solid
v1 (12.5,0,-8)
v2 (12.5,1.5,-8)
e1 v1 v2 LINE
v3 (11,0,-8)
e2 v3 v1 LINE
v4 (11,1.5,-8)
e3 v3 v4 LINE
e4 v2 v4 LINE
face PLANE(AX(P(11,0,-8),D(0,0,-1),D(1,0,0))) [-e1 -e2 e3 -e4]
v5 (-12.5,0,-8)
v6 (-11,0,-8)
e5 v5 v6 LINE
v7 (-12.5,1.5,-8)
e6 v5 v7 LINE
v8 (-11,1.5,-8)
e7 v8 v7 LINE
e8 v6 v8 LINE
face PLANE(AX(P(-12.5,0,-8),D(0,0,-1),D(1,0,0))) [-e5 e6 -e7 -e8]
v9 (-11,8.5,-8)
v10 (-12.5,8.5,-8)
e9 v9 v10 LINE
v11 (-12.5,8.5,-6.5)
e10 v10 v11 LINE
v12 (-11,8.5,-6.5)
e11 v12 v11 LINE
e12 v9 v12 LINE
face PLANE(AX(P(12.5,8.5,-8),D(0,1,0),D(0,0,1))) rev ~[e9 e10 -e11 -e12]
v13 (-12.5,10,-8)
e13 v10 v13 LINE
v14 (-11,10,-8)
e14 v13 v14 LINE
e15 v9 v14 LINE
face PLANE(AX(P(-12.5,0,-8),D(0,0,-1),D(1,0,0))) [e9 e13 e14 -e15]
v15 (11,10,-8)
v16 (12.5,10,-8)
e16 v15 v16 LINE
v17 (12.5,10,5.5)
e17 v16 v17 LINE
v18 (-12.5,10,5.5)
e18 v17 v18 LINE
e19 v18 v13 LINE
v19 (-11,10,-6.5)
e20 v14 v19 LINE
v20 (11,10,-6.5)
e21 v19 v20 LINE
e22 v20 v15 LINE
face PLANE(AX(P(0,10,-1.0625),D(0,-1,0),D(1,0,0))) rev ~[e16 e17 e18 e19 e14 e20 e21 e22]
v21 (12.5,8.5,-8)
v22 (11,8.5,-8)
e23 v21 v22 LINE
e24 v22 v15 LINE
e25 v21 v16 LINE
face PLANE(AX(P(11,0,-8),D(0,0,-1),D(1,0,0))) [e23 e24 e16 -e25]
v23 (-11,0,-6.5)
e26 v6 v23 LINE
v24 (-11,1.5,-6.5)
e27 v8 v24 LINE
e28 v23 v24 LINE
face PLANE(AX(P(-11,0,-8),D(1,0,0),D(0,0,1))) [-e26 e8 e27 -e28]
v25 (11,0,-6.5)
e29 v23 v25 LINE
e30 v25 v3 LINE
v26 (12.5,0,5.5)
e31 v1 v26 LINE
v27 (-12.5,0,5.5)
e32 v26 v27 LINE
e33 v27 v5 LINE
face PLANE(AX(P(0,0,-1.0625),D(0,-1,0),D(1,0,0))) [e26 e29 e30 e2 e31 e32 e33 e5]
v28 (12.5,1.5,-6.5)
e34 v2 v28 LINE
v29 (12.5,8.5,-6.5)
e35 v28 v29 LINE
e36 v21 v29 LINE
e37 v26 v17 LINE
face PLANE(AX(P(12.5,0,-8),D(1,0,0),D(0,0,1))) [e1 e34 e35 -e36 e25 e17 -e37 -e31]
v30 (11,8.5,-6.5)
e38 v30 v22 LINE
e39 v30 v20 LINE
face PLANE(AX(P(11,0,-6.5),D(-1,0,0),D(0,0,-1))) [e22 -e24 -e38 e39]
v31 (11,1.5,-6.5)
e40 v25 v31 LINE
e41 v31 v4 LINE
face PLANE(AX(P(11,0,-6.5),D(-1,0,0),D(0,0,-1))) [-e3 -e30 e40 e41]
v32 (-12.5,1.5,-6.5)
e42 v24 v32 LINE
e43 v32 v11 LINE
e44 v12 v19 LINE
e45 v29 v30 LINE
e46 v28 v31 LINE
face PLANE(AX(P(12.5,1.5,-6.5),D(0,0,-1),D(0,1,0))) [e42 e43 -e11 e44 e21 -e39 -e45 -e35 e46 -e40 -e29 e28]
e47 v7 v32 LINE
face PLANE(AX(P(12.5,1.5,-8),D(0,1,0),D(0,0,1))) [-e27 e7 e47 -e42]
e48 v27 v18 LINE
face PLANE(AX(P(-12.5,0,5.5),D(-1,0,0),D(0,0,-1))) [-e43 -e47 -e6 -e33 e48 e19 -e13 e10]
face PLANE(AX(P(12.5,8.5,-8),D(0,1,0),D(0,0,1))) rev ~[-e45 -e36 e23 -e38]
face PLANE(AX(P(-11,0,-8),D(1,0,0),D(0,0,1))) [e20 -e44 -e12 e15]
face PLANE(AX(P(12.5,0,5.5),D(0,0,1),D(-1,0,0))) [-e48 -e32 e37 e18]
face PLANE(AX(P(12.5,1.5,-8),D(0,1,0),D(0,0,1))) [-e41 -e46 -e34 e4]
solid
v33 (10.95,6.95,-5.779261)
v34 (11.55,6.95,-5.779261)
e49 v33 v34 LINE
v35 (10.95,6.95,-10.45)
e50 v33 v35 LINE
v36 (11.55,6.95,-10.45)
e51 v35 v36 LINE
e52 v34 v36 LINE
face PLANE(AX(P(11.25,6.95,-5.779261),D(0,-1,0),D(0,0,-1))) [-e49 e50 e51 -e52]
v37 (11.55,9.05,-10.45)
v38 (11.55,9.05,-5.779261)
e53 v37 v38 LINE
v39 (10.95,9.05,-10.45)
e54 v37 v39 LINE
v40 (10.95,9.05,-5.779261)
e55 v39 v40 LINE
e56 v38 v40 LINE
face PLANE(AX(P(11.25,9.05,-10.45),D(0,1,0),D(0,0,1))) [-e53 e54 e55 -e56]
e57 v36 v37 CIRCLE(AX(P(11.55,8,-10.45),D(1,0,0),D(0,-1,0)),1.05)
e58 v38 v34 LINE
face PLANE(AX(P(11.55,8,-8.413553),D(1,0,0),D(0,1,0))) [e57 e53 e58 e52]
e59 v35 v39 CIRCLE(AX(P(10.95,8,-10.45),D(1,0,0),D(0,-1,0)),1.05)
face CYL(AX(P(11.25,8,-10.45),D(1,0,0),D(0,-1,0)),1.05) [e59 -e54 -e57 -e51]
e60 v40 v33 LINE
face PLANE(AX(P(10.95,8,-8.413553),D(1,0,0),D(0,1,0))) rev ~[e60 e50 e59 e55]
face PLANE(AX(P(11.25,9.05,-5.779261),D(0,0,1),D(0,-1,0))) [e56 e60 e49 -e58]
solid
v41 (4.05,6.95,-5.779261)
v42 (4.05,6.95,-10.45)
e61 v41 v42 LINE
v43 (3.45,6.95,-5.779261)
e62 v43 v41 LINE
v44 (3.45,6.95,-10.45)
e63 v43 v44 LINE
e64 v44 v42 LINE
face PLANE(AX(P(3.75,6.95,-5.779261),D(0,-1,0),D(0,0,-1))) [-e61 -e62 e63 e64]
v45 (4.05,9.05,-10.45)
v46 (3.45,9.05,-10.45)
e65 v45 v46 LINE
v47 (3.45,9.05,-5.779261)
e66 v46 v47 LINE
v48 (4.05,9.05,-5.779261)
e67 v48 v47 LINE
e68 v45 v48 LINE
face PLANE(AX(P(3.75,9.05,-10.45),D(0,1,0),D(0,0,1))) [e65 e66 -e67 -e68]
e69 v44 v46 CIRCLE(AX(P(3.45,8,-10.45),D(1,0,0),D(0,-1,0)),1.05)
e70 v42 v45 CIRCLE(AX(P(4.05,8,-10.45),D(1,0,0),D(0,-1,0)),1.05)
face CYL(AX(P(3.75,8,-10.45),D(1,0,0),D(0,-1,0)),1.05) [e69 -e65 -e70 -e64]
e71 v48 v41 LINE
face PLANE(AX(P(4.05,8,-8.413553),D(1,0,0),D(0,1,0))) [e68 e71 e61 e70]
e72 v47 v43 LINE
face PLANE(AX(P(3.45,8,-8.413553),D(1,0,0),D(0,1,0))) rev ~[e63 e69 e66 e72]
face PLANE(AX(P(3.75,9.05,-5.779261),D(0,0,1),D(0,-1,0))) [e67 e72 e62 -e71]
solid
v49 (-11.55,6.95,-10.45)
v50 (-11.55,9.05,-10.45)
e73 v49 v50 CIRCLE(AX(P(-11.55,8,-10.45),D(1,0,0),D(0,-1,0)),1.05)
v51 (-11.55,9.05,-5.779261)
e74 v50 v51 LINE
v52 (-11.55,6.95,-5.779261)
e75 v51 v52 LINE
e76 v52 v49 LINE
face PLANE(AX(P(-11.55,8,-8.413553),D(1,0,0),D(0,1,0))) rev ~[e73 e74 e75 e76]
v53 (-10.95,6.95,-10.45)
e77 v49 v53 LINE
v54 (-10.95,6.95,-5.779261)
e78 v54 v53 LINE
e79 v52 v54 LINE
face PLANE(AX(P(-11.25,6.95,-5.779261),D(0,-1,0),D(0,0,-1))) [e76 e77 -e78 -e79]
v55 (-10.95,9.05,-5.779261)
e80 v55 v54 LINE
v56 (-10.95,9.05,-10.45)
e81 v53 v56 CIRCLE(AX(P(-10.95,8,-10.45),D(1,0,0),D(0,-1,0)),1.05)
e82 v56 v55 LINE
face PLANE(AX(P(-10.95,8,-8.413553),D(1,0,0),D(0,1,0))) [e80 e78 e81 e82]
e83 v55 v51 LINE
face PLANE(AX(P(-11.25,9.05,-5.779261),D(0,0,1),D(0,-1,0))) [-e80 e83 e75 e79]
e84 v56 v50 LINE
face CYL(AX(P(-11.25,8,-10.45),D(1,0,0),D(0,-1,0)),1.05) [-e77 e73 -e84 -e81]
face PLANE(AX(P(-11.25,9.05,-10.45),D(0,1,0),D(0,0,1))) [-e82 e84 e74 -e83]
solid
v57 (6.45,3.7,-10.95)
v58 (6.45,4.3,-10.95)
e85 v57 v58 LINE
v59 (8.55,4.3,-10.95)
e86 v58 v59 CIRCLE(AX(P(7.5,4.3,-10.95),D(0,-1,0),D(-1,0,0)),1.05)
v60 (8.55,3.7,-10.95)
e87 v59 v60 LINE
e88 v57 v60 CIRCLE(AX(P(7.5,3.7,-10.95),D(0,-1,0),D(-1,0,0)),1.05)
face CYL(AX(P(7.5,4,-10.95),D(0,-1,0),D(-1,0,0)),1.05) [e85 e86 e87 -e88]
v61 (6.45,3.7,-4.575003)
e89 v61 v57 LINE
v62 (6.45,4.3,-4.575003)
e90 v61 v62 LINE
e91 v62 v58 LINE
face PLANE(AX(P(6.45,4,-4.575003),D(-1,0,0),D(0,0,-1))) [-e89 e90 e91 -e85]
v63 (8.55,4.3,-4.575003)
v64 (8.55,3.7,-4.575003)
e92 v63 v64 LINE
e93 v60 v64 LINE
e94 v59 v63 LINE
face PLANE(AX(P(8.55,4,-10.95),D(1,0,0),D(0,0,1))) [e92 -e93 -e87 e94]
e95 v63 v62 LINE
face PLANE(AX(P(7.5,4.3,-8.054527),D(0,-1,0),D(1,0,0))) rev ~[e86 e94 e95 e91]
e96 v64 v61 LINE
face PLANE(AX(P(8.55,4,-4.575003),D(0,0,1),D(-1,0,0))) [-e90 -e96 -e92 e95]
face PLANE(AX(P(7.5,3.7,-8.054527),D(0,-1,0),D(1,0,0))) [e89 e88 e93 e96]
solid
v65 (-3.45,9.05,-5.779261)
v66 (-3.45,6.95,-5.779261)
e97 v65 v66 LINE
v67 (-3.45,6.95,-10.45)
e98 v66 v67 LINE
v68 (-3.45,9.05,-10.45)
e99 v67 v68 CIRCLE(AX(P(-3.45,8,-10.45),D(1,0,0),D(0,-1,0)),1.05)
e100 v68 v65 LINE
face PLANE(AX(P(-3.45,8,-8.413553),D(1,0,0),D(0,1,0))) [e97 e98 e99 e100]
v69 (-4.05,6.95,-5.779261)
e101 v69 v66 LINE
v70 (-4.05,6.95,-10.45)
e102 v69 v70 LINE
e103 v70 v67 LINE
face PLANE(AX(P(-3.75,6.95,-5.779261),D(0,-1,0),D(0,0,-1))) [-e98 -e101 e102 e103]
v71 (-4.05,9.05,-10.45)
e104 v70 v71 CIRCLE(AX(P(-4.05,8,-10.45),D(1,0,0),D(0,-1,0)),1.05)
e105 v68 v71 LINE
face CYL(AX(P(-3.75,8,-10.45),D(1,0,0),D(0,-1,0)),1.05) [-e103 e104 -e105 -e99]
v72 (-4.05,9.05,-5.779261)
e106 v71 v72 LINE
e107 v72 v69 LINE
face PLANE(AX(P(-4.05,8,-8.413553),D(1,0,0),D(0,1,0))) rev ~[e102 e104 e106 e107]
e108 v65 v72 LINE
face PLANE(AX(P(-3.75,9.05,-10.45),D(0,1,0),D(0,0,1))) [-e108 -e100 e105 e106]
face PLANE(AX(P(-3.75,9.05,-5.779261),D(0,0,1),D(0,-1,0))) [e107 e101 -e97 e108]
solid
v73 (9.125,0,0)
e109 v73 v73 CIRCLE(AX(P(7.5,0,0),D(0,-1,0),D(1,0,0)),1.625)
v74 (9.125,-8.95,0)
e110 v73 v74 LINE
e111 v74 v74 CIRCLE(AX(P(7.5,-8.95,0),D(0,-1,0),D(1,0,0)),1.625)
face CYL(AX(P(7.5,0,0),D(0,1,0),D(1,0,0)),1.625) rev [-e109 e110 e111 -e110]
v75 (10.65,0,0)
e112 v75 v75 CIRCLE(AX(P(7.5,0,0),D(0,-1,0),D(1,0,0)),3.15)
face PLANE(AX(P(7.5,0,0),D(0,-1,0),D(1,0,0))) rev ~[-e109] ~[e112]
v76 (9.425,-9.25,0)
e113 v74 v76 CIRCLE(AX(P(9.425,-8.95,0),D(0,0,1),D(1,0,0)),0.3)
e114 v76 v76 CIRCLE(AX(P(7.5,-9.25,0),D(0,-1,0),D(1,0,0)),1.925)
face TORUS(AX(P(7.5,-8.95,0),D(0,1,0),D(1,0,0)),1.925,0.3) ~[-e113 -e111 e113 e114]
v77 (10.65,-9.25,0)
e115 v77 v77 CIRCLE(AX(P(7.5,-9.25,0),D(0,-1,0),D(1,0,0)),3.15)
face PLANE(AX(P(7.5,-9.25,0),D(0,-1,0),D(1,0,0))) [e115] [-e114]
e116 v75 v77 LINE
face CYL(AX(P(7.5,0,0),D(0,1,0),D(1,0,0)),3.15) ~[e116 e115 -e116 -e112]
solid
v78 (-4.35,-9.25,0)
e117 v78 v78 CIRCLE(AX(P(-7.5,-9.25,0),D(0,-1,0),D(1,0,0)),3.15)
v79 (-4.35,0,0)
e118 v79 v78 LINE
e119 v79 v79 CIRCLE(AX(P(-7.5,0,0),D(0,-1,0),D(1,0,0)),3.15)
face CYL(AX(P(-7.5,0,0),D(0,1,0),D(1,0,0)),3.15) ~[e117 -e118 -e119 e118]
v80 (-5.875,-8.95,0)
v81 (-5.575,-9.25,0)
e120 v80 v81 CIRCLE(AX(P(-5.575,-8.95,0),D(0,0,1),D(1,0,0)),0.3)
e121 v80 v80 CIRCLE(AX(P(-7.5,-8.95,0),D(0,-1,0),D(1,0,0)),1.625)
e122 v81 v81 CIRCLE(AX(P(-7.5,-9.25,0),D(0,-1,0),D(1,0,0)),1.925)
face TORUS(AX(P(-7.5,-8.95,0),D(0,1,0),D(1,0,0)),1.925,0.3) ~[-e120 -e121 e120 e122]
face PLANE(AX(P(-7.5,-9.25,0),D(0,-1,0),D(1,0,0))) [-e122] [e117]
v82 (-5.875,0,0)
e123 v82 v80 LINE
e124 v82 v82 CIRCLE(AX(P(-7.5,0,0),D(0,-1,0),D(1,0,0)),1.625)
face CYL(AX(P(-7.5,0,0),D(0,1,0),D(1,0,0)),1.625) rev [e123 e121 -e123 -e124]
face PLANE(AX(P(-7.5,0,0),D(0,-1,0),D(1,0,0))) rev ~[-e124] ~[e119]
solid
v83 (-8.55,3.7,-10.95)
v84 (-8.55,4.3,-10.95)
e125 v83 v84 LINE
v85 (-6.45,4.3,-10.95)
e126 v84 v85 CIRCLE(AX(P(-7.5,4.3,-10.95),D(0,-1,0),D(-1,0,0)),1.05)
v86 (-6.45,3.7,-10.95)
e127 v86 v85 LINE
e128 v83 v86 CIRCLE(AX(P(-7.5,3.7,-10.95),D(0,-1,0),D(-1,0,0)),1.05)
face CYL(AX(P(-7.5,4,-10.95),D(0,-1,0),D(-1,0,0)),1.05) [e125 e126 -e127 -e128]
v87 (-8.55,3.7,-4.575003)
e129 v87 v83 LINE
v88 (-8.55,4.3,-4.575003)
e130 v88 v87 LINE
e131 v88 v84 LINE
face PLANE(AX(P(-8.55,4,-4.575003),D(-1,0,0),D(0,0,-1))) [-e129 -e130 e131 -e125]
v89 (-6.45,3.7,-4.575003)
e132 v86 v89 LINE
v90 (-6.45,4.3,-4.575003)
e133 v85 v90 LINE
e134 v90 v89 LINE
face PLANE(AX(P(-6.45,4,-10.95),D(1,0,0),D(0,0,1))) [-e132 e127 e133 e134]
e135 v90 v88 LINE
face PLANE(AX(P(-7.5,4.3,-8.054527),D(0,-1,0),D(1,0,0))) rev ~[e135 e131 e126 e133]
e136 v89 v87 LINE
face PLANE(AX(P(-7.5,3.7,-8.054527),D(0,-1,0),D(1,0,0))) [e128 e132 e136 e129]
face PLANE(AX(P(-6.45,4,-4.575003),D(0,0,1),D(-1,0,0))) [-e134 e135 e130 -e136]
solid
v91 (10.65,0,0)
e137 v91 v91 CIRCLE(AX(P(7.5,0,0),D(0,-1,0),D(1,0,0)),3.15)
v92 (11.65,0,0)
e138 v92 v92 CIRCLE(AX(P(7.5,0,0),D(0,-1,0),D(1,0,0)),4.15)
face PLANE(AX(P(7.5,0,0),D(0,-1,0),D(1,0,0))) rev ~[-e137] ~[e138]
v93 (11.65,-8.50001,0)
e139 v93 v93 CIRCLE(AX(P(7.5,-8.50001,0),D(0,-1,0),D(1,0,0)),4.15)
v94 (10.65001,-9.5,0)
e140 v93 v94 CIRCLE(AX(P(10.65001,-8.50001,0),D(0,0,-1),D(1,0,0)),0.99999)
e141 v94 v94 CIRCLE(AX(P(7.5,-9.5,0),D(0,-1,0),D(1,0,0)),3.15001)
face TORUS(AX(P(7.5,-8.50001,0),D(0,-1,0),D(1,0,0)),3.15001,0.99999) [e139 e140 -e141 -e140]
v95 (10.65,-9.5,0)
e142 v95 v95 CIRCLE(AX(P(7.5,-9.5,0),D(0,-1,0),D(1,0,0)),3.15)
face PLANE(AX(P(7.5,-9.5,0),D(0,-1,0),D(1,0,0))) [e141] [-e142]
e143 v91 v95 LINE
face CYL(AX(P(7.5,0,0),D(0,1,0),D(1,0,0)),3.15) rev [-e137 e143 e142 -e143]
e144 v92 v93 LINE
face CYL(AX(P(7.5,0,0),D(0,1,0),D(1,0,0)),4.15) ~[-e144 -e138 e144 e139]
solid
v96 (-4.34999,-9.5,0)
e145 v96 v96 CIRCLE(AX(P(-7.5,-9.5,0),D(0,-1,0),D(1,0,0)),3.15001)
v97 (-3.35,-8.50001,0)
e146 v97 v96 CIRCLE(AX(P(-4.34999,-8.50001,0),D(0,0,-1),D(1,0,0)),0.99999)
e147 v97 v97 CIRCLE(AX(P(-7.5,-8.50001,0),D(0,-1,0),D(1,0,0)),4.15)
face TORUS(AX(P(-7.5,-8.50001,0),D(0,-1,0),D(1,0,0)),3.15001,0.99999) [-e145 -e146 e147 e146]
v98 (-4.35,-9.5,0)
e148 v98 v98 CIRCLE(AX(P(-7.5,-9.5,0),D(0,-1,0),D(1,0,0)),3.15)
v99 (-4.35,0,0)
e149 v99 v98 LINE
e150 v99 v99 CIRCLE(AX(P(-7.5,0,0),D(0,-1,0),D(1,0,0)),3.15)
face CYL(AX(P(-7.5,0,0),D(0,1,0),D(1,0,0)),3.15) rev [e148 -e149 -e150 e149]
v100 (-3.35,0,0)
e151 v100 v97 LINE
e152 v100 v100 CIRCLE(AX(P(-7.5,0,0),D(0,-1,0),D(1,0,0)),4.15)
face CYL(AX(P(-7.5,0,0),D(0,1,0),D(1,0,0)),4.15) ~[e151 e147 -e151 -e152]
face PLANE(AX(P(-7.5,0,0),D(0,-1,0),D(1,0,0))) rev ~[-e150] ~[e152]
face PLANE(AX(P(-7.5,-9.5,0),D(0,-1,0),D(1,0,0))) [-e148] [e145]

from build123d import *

# Parameters (mm, degrees)
F0_R           = 4.15
F0_R_2         = 3.15
F1_DEPTH       = 9.5
F0_R_3         = 1.625
F2_DEPTH       = 9.25
F3_R           = 0.99999
F3_2_R         = 0.99999
F4_DEPTH       = 10
F6_W           = 7
F6_H           = 1.5
F7_DEPTH       = 25
F10_DEPTH      = 0.3
F10_DEPTH_BACK = 0.3
F19_DEPTH      = 0.3
F19_DEPTH_BACK = 0.3
F20_R          = 0.3
F20_2_R        = 0.3


# Not quite as in the source:
# - a fillet or chamfer is up to 0.001 mm smaller than in the source, because OpenCascade refuses the exact size


with BuildPart() as f1:
    # F0 (on Front) → F1 (new body)
    with BuildSketch(Plane.XZ):
        with Locations((-7.5, 0)):
            Circle(F0_R)
        with Locations((-7.5, 0)):
            Circle(F0_R_2, mode=Mode.SUBTRACT)
    extrude(amount=F1_DEPTH)

    # F3 (radius 1 in the source; OpenCascade refuses exactly that, so slightly less here)
    f3_edges = [f1.edges().sort_by_distance(p)[0] for p in [
        (-11.65, -9.5, 0),
    ]]
    fillet(f3_edges, radius=F3_R)


with BuildPart() as f1b:
    # F0 (on Front) → F1, piece 2 (new body)
    with BuildSketch(Plane.XZ):
        with Locations((7.5, 0)):
            Circle(F0_R)
        with Locations((7.5, 0)):
            Circle(F0_R_2, mode=Mode.SUBTRACT)
    extrude(amount=F1_DEPTH)

    # F3#2 (radius 1 in the source; OpenCascade refuses exactly that, so slightly less here)
    f3_2_edges = [f1b.edges().sort_by_distance(p)[0] for p in [
        (3.35, -9.5, 0),
    ]]
    fillet(f3_2_edges, radius=F3_2_R)


with BuildPart() as f2:
    # F0 (on Front) → F2 (new body)
    with BuildSketch(Plane.XZ):
        with Locations((-7.5, 0)):
            Circle(F0_R_2)
        with Locations((-7.5, 0)):
            Circle(F0_R_3, mode=Mode.SUBTRACT)
    extrude(amount=F2_DEPTH)

    # F20
    f20_edges = [f2.edges().sort_by_distance(p)[0] for p in [
        (-9.125, -9.25, 0),
    ]]
    fillet(f20_edges, radius=F20_R)


with BuildPart() as f2b:
    # F0 (on Front) → F2, piece 2 (new body)
    with BuildSketch(Plane.XZ):
        with Locations((7.5, 0)):
            Circle(F0_R_2)
        with Locations((7.5, 0)):
            Circle(F0_R_3, mode=Mode.SUBTRACT)
    extrude(amount=F2_DEPTH)

    # F20#2
    f20_2_edges = [f2b.edges().sort_by_distance(p)[0] for p in [
        (5.875, -9.25, 0),
    ]]
    fillet(f20_2_edges, radius=F20_2_R)


with BuildPart() as f4:
    # F0 (on Front) → F4 (new body)
    with BuildSketch(Plane.XZ):
        Polygon((12.5, 5.5), (-12.5, 5.5), (-12.5, -8), (-11, -8), (-11, -6.5), (11, -6.5), (11, -8), (12.5, -8), align=None)
        with Locations((-7.5, 0)):
            Circle(F0_R, mode=Mode.SUBTRACT)
        with Locations((7.5, 0)):
            Circle(F0_R, mode=Mode.SUBTRACT)
        with Locations((7.5, 0)):
            Circle(F0_R)
        with Locations((7.5, 0)):
            Circle(F0_R_2, mode=Mode.SUBTRACT)
        with Locations((-7.5, 0)):
            Circle(F0_R)
        with Locations((-7.5, 0)):
            Circle(F0_R_2, mode=Mode.SUBTRACT)
        with Locations((7.5, 0)):
            Circle(F0_R_2)
        with Locations((7.5, 0)):
            Circle(F0_R_3, mode=Mode.SUBTRACT)
        with Locations((-7.5, 0)):
            Circle(F0_R_2)
        with Locations((-7.5, 0)):
            Circle(F0_R_3, mode=Mode.SUBTRACT)
        with Locations((7.5, 0)):
            Circle(F0_R_3)
        with Locations((-7.5, 0)):
            Circle(F0_R_3)
    extrude(amount=-F4_DEPTH)

    # F6 (on offset) → F7 (cut)
    with BuildSketch(Plane.YZ.offset(12.5)):
        with Locations((5, -7.25)):
            Rectangle(F6_W, F6_H)
    extrude(amount=-F7_DEPTH, mode=Mode.SUBTRACT)


with BuildPart() as f10:
    # F9 (on offset) → F10 (new body, two sides)
    with BuildSketch(Plane.XZ.offset(-4)) as f10_sk:
        with BuildLine():
            Line((-6.45, -10.95), (-6.45, -4.5750031686))
            Line((-6.45, -4.5750031686), (-8.55, -4.5750031686))
            Line((-8.55, -4.5750031686), (-8.55, -10.95))
            ThreePointArc((-8.55, -10.95), (-7.5, -12), (-6.45, -10.95))
        make_face()
    extrude(amount=F10_DEPTH)
    extrude(f10_sk.sketch, amount=-F10_DEPTH_BACK)


with BuildPart() as f10b:
    # F9 (on offset) → F10, piece 2 (new body, two sides)
    with BuildSketch(Plane.XZ.offset(-4)) as f10_2_sk:
        with BuildLine():
            ThreePointArc((6.45, -10.95), (7.5, -12), (8.55, -10.95))
            Line((8.55, -10.95), (8.55, -4.5750031686))
            Line((8.55, -4.5750031686), (6.45, -4.5750031686))
            Line((6.45, -4.5750031686), (6.45, -10.95))
        make_face()
    extrude(amount=F10_DEPTH)
    extrude(f10_2_sk.sketch, amount=-F10_DEPTH_BACK)


with BuildPart() as f19:
    # F18 (on offset) → F19 (new body, two sides)
    with BuildSketch(Plane.YZ.offset(-11.25)) as f19_sk:
        with BuildLine():
            Line((9.05, -5.7792608787), (6.95, -5.7792608787))
            Line((6.95, -5.7792608787), (6.95, -10.45))
            ThreePointArc((6.95, -10.45), (8, -11.5), (9.05, -10.45))
            Line((9.05, -10.45), (9.05, -5.7792608787))
        make_face()
    extrude(amount=F19_DEPTH)
    extrude(f19_sk.sketch, amount=-F19_DEPTH_BACK)


with BuildPart() as f19b:
    # F17 (on offset) → F19, piece 2 (new body, two sides)
    with BuildSketch(Plane.YZ.offset(-3.75)) as f19_2_sk:
        with BuildLine():
            Line((9.05, -5.7792608787), (6.95, -5.7792608787))
            Line((6.95, -5.7792608787), (6.95, -10.45))
            ThreePointArc((6.95, -10.45), (8, -11.5), (9.05, -10.45))
            Line((9.05, -10.45), (9.05, -5.7792608787))
        make_face()
    extrude(amount=F19_DEPTH)
    extrude(f19_2_sk.sketch, amount=-F19_DEPTH_BACK)


with BuildPart() as f19c:
    # F16 (on offset) → F19, piece 3 (new body, two sides)
    with BuildSketch(Plane.YZ.offset(3.75)) as f19_3_sk:
        with BuildLine():
            Line((9.05, -5.7792608787), (6.95, -5.7792608787))
            Line((6.95, -5.7792608787), (6.95, -10.45))
            ThreePointArc((6.95, -10.45), (8, -11.5), (9.05, -10.45))
            Line((9.05, -10.45), (9.05, -5.7792608787))
        make_face()
    extrude(amount=F19_DEPTH)
    extrude(f19_3_sk.sketch, amount=-F19_DEPTH_BACK)


with BuildPart() as f19d:
    # F15 (on offset) → F19, piece 4 (new body, two sides)
    with BuildSketch(Plane.YZ.offset(11.25)) as f19_4_sk:
        with BuildLine():
            Line((9.05, -5.7792608787), (6.95, -5.7792608787))
            Line((6.95, -5.7792608787), (6.95, -10.45))
            ThreePointArc((6.95, -10.45), (8, -11.5), (9.05, -10.45))
            Line((9.05, -10.45), (9.05, -5.7792608787))
        make_face()
    extrude(amount=F19_DEPTH)
    extrude(f19_4_sk.sketch, amount=-F19_DEPTH_BACK)


solid = Compound([f1.part, f1b.part, f2.part, f2b.part, f4.part, f10.part, f10b.part, f19.part, f19b.part, f19c.part, f19d.part])
